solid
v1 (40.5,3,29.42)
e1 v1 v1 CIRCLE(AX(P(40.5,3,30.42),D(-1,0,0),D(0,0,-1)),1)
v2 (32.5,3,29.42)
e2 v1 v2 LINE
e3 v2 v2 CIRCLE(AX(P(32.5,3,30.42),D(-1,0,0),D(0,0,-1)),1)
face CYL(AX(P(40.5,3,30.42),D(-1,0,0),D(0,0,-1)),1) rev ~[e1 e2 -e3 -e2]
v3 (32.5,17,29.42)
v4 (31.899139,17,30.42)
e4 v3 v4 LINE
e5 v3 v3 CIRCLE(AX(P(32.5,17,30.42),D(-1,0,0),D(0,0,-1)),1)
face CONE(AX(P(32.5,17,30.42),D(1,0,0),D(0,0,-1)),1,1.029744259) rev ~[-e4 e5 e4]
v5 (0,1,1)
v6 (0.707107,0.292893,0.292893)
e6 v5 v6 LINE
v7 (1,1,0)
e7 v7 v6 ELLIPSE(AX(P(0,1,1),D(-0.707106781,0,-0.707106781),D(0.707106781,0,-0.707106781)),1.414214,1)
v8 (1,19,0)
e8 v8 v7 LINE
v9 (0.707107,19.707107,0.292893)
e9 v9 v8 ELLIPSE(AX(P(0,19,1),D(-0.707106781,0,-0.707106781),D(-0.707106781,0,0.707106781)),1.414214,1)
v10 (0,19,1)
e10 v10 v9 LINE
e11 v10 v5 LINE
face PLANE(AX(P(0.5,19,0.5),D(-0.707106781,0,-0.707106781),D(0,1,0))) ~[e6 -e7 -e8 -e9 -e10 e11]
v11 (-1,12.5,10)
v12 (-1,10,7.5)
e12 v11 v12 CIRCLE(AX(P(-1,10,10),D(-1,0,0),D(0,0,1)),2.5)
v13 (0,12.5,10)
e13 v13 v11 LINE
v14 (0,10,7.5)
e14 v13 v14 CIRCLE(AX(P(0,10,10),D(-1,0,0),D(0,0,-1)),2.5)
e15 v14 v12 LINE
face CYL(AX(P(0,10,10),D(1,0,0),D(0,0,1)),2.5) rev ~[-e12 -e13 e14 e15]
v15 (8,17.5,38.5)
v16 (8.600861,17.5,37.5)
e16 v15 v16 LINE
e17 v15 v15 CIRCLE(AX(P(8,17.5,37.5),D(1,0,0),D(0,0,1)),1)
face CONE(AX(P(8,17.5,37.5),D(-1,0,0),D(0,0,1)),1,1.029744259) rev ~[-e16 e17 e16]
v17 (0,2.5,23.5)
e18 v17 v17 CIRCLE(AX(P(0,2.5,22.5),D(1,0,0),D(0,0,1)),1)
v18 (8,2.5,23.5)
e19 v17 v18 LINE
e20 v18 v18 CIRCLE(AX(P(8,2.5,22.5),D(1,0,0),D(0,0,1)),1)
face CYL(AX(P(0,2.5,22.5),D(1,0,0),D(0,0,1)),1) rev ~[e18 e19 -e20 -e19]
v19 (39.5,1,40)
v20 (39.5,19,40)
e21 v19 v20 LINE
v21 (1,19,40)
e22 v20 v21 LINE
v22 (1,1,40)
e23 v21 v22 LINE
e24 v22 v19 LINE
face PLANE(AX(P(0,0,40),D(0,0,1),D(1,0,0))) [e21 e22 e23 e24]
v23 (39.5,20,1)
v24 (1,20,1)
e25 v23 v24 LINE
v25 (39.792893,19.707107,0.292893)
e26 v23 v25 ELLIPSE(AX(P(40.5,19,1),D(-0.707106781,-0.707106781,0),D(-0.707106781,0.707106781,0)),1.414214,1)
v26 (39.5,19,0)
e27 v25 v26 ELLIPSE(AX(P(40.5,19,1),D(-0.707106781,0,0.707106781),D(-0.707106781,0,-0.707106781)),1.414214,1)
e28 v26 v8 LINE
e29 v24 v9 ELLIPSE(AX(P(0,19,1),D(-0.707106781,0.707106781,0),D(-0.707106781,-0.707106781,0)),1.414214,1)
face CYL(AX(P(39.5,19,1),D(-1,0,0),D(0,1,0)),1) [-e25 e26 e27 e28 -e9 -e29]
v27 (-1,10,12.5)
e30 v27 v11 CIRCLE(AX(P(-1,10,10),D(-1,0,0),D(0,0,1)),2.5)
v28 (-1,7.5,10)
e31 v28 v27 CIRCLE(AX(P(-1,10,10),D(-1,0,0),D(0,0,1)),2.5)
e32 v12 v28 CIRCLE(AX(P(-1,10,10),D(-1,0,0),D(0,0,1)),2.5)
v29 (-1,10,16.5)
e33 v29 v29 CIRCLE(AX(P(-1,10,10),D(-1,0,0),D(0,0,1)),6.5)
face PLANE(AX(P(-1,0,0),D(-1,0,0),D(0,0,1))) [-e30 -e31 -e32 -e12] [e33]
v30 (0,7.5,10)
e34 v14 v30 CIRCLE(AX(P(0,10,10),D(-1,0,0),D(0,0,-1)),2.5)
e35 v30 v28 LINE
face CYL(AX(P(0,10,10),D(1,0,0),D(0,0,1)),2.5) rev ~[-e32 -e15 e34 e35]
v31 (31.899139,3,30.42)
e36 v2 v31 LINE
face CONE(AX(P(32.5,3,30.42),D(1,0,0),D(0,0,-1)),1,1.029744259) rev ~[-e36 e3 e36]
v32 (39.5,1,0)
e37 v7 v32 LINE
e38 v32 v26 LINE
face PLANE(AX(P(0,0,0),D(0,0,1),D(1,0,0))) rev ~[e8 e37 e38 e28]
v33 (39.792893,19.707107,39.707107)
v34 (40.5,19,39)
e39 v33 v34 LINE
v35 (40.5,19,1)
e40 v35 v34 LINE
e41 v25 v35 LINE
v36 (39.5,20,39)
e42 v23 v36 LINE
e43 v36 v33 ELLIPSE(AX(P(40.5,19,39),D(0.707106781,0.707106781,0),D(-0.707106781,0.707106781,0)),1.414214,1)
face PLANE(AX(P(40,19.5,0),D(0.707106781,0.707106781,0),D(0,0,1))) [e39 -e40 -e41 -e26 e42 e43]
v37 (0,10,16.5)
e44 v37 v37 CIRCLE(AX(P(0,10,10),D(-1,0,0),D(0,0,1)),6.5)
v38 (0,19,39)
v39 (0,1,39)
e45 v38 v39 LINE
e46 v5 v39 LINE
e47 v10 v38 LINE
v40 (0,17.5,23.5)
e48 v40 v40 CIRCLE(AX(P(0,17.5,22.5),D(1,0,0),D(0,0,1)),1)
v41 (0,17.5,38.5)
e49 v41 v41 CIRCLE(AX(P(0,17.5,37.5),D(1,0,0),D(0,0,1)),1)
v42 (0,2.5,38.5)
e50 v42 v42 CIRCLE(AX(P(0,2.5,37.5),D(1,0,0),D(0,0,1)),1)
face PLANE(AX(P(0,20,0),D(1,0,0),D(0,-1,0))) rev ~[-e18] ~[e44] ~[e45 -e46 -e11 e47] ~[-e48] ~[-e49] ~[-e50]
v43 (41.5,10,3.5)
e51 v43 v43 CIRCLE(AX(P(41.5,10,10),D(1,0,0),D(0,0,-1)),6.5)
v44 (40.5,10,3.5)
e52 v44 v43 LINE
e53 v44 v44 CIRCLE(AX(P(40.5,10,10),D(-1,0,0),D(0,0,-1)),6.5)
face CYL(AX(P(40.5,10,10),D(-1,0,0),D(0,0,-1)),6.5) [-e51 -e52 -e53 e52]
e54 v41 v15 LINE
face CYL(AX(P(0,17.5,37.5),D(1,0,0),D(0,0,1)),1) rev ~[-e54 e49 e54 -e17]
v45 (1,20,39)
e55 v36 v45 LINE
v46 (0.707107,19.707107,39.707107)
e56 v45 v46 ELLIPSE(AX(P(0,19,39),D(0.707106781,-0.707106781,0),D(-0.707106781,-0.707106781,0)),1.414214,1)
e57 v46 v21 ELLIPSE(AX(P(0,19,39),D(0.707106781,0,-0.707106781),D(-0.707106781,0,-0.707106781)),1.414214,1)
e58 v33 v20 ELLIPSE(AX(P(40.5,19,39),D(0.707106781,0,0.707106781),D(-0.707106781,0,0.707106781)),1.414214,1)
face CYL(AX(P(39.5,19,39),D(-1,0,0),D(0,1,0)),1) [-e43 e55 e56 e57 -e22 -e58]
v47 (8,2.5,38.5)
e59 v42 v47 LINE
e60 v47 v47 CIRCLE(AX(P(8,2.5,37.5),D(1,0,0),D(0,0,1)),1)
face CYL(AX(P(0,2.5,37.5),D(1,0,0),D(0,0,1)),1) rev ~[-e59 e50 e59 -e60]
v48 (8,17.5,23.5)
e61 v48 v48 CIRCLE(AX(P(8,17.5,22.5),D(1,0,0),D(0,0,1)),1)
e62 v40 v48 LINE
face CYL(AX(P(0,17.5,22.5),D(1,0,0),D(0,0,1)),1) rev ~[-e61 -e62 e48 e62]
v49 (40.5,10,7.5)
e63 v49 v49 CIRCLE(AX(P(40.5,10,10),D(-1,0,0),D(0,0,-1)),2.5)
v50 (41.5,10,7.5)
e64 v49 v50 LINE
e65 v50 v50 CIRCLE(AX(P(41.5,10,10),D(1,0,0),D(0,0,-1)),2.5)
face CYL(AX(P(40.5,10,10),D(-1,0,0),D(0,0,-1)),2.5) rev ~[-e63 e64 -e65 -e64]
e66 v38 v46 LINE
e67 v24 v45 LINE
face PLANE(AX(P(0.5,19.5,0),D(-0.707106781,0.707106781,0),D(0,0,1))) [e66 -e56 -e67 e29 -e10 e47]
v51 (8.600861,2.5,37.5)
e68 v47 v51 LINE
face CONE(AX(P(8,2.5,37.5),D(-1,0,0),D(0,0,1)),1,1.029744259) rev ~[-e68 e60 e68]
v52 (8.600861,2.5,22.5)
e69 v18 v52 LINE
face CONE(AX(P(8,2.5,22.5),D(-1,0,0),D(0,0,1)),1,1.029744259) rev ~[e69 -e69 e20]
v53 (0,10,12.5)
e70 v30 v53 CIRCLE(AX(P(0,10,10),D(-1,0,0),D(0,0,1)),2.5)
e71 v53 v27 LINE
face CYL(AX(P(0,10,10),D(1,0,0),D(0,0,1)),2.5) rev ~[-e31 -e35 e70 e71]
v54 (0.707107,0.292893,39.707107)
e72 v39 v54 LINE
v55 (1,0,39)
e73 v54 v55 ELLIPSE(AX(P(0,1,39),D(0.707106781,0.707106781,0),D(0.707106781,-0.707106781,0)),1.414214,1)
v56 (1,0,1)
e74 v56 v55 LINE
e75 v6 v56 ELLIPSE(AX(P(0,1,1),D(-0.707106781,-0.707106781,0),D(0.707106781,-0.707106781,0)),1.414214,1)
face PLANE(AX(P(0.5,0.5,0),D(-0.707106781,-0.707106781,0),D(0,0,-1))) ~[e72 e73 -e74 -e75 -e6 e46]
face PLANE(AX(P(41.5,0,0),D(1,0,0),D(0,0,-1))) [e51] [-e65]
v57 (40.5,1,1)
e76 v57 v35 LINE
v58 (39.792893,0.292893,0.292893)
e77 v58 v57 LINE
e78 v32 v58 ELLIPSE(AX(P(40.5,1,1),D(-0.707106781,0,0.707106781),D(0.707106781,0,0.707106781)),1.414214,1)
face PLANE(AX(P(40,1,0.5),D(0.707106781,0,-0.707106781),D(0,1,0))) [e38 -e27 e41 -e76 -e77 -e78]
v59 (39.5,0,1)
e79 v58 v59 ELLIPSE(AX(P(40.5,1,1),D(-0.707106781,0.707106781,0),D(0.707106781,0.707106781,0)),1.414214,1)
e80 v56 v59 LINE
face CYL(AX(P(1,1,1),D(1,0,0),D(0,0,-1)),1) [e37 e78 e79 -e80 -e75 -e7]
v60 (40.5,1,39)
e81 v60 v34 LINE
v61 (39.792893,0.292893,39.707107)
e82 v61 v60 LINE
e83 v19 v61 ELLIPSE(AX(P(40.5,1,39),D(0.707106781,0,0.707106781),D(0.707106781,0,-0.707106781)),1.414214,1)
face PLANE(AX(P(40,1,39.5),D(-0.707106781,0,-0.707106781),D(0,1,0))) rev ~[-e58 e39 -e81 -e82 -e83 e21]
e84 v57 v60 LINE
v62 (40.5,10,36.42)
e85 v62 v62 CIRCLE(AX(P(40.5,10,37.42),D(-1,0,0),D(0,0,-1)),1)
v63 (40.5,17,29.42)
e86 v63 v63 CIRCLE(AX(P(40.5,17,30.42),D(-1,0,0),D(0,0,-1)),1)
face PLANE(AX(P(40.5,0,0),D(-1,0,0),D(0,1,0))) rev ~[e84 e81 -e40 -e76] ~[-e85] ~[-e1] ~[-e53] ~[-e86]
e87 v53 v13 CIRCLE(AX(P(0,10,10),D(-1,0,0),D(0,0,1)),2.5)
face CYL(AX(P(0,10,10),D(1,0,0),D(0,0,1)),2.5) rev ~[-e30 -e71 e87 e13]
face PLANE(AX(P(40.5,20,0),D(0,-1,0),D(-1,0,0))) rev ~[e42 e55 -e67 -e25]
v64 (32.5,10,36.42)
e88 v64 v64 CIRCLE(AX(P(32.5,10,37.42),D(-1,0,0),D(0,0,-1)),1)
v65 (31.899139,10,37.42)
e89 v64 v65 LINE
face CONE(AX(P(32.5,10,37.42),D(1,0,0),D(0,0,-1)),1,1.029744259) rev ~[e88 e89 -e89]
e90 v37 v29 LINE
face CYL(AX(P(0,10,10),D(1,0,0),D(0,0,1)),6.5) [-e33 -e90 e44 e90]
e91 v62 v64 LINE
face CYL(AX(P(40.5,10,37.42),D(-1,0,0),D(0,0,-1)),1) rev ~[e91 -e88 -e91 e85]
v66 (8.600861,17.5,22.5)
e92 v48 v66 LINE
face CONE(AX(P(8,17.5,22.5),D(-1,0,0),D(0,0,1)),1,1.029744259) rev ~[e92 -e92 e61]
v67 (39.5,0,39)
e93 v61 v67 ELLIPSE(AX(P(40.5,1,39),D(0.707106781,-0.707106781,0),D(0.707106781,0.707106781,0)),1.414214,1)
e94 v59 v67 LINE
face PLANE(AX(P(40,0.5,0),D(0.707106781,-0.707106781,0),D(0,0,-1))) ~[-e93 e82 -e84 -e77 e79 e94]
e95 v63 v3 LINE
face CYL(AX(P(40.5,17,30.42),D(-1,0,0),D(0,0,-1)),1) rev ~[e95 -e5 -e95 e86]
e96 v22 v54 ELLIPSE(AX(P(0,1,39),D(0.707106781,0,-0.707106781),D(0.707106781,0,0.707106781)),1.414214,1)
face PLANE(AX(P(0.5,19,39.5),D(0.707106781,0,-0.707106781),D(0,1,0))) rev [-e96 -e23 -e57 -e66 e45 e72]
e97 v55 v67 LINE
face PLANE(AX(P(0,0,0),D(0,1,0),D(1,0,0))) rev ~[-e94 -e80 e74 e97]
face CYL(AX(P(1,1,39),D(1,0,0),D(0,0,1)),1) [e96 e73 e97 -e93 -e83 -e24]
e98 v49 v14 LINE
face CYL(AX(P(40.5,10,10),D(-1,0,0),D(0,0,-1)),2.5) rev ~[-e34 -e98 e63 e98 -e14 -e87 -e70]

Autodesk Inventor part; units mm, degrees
ref_plane "YZ Plane" through (0, 0, 0) normal (1, 0, 0) x (0, 1, 0)
ref_plane "XZ Plane" through (0, 0, 0) normal (0, 1, 0) x (-1, 0, 0)
ref_plane "XY Plane" through (0, 0, 0) normal (0, 0, 1) x (1, 0, 0)
sketch "スケッチ1" plane through (0, 0, 0) normal (0, 0, 1) x (1, 0, 0)
  line L0 (0, 0) -> (40.5, 0)
  line L1 (40.5, 0) -> (40.5, 20)
  line L2 (40.5, 20) -> (0, 20)
  line L3 (0, 20) -> (0, 0)
  dimension "d0" = 40.5
  dimension "d1" = 20
extrude "押し出し1" add sketch "スケッチ1" along normal blind 40
sketch "スケッチ2" plane through (40.5, 0, 0) normal (1, 0, 0) x (0, 0, -1)
  circle A0 centre (-10, 10) radius 10
  line L0 (0, 0) -> (0, 20) projected
  line L1 (0, 10) -> (-40, 10)
  line L2 (-40, 0) -> (-40, 20) projected
  dimension "d4" = 20
hole "穴1" at (40.5, 10, 10) direction (-1, 0, 0) diameter 5 end through all
sketch "スケッチ3" plane through (40.5, 0, 0) normal (1, 0, 0) x (0, 0, -1)
  circle A0 centre (-10, 10) radius 6.5
  line L0 (0, 20) -> (0, 0) projected
  line L1 (0, 10) -> (-40, 10)
  line L2 (-40, 20) -> (-40, 0) projected
  circle A1 centre (-10, 10) radius 2.5 projected
  line L3 (-10, 12.5) -> (-10, 7.5)
  dimension "d12" = 13
extrude "押し出し2" add sketch "スケッチ3" along normal blind 1 contours L1 A1 A0 | A0 L1 A1
sketch "スケッチ4" plane through (0, 0, 0) normal (-1, 0, 0) x (0, 0, 1)
  circle A0 centre (10, 10) radius 2.5 projected
  line L0 (10, 12.5) -> (10, 7.5)
  line L1 (12.5, 10) -> (7.5, 10)
  circle A1 centre (10, 10) radius 6.5
  point P0 (0, 0)
  dimension "d15" = 13
extrude "押し出し3" add sketch "スケッチ4" along normal blind 1
chamfer "面取り1" distance 1 angle 45 4 edges at (0, 20, 20) (40.5, 20, 20) (0, 0, 20) (40.5, 0, 20)
chamfer "面取り2" distance 1 angle 45 4 edges at (40.5, 10, 0) (0, 10, 0) (40.5, 10, 40) (0, 10, 40)
fillet "フィレット1" radius 1 4 edges at (20.25, 20, 40) (20.25, 0, 40) (20.25, 20, 0) (20.25, 0, 0)
sketch "スケッチ5" plane through (0, 1, 39) normal (-1, 0, 0) x (0, 0, 1)
  line L0 (-1.5, 16.5) -> (-16.5, 16.5)
  line L1 (-16.5, 16.5) -> (-16.5, 1.5)
  line L2 (-16.5, 1.5) -> (-1.5, 1.5)
  line L3 (-1.5, 1.5) -> (-1.5, 16.5)
  line L4 (0, 19) -> (-38, 19) projected
  line L5 (0, 18) -> (0, 0) projected
  point P0 (-39, -1)
  dimension "d25" = 15
  dimension "d26" = 2.5
  dimension "d27" = 15
  dimension "d45" = 1.5
hole "穴2" at (0, 17.5, 22.5) at (0, 2.5, 22.5) at (0, 17.5, 37.5) at (0, 2.5, 37.5) direction (1, 0, 0) diameter 2 depth 8 tip angle 118
sketch "スケッチ6" plane through (40.5, 1, 39) normal (1, 0, 0) x (0, 0, -1)
  circle A0 centre (8.58, 9) radius 7
  line L0 (-1, 0) -> (-1, 18) projected
  line L1 (-1, 9) -> (38.1448, 9)
  line L2 (8.58, 16) -> (8.58, 2)
  line L3 (39, 0) -> (39, 18) projected
  point P0 (39, -1)
  point P1 (1.58, 9)
  dimension "d36" = 14
  dimension "d37" = 30.42
hole "穴3" at (40.5, 10, 37.42) at (40.5, 17, 30.42) at (40.5, 3, 30.42) direction (-1, 0, 0) diameter 2 depth 8 tip angle 118
properties part number "サーボパーツ1"
